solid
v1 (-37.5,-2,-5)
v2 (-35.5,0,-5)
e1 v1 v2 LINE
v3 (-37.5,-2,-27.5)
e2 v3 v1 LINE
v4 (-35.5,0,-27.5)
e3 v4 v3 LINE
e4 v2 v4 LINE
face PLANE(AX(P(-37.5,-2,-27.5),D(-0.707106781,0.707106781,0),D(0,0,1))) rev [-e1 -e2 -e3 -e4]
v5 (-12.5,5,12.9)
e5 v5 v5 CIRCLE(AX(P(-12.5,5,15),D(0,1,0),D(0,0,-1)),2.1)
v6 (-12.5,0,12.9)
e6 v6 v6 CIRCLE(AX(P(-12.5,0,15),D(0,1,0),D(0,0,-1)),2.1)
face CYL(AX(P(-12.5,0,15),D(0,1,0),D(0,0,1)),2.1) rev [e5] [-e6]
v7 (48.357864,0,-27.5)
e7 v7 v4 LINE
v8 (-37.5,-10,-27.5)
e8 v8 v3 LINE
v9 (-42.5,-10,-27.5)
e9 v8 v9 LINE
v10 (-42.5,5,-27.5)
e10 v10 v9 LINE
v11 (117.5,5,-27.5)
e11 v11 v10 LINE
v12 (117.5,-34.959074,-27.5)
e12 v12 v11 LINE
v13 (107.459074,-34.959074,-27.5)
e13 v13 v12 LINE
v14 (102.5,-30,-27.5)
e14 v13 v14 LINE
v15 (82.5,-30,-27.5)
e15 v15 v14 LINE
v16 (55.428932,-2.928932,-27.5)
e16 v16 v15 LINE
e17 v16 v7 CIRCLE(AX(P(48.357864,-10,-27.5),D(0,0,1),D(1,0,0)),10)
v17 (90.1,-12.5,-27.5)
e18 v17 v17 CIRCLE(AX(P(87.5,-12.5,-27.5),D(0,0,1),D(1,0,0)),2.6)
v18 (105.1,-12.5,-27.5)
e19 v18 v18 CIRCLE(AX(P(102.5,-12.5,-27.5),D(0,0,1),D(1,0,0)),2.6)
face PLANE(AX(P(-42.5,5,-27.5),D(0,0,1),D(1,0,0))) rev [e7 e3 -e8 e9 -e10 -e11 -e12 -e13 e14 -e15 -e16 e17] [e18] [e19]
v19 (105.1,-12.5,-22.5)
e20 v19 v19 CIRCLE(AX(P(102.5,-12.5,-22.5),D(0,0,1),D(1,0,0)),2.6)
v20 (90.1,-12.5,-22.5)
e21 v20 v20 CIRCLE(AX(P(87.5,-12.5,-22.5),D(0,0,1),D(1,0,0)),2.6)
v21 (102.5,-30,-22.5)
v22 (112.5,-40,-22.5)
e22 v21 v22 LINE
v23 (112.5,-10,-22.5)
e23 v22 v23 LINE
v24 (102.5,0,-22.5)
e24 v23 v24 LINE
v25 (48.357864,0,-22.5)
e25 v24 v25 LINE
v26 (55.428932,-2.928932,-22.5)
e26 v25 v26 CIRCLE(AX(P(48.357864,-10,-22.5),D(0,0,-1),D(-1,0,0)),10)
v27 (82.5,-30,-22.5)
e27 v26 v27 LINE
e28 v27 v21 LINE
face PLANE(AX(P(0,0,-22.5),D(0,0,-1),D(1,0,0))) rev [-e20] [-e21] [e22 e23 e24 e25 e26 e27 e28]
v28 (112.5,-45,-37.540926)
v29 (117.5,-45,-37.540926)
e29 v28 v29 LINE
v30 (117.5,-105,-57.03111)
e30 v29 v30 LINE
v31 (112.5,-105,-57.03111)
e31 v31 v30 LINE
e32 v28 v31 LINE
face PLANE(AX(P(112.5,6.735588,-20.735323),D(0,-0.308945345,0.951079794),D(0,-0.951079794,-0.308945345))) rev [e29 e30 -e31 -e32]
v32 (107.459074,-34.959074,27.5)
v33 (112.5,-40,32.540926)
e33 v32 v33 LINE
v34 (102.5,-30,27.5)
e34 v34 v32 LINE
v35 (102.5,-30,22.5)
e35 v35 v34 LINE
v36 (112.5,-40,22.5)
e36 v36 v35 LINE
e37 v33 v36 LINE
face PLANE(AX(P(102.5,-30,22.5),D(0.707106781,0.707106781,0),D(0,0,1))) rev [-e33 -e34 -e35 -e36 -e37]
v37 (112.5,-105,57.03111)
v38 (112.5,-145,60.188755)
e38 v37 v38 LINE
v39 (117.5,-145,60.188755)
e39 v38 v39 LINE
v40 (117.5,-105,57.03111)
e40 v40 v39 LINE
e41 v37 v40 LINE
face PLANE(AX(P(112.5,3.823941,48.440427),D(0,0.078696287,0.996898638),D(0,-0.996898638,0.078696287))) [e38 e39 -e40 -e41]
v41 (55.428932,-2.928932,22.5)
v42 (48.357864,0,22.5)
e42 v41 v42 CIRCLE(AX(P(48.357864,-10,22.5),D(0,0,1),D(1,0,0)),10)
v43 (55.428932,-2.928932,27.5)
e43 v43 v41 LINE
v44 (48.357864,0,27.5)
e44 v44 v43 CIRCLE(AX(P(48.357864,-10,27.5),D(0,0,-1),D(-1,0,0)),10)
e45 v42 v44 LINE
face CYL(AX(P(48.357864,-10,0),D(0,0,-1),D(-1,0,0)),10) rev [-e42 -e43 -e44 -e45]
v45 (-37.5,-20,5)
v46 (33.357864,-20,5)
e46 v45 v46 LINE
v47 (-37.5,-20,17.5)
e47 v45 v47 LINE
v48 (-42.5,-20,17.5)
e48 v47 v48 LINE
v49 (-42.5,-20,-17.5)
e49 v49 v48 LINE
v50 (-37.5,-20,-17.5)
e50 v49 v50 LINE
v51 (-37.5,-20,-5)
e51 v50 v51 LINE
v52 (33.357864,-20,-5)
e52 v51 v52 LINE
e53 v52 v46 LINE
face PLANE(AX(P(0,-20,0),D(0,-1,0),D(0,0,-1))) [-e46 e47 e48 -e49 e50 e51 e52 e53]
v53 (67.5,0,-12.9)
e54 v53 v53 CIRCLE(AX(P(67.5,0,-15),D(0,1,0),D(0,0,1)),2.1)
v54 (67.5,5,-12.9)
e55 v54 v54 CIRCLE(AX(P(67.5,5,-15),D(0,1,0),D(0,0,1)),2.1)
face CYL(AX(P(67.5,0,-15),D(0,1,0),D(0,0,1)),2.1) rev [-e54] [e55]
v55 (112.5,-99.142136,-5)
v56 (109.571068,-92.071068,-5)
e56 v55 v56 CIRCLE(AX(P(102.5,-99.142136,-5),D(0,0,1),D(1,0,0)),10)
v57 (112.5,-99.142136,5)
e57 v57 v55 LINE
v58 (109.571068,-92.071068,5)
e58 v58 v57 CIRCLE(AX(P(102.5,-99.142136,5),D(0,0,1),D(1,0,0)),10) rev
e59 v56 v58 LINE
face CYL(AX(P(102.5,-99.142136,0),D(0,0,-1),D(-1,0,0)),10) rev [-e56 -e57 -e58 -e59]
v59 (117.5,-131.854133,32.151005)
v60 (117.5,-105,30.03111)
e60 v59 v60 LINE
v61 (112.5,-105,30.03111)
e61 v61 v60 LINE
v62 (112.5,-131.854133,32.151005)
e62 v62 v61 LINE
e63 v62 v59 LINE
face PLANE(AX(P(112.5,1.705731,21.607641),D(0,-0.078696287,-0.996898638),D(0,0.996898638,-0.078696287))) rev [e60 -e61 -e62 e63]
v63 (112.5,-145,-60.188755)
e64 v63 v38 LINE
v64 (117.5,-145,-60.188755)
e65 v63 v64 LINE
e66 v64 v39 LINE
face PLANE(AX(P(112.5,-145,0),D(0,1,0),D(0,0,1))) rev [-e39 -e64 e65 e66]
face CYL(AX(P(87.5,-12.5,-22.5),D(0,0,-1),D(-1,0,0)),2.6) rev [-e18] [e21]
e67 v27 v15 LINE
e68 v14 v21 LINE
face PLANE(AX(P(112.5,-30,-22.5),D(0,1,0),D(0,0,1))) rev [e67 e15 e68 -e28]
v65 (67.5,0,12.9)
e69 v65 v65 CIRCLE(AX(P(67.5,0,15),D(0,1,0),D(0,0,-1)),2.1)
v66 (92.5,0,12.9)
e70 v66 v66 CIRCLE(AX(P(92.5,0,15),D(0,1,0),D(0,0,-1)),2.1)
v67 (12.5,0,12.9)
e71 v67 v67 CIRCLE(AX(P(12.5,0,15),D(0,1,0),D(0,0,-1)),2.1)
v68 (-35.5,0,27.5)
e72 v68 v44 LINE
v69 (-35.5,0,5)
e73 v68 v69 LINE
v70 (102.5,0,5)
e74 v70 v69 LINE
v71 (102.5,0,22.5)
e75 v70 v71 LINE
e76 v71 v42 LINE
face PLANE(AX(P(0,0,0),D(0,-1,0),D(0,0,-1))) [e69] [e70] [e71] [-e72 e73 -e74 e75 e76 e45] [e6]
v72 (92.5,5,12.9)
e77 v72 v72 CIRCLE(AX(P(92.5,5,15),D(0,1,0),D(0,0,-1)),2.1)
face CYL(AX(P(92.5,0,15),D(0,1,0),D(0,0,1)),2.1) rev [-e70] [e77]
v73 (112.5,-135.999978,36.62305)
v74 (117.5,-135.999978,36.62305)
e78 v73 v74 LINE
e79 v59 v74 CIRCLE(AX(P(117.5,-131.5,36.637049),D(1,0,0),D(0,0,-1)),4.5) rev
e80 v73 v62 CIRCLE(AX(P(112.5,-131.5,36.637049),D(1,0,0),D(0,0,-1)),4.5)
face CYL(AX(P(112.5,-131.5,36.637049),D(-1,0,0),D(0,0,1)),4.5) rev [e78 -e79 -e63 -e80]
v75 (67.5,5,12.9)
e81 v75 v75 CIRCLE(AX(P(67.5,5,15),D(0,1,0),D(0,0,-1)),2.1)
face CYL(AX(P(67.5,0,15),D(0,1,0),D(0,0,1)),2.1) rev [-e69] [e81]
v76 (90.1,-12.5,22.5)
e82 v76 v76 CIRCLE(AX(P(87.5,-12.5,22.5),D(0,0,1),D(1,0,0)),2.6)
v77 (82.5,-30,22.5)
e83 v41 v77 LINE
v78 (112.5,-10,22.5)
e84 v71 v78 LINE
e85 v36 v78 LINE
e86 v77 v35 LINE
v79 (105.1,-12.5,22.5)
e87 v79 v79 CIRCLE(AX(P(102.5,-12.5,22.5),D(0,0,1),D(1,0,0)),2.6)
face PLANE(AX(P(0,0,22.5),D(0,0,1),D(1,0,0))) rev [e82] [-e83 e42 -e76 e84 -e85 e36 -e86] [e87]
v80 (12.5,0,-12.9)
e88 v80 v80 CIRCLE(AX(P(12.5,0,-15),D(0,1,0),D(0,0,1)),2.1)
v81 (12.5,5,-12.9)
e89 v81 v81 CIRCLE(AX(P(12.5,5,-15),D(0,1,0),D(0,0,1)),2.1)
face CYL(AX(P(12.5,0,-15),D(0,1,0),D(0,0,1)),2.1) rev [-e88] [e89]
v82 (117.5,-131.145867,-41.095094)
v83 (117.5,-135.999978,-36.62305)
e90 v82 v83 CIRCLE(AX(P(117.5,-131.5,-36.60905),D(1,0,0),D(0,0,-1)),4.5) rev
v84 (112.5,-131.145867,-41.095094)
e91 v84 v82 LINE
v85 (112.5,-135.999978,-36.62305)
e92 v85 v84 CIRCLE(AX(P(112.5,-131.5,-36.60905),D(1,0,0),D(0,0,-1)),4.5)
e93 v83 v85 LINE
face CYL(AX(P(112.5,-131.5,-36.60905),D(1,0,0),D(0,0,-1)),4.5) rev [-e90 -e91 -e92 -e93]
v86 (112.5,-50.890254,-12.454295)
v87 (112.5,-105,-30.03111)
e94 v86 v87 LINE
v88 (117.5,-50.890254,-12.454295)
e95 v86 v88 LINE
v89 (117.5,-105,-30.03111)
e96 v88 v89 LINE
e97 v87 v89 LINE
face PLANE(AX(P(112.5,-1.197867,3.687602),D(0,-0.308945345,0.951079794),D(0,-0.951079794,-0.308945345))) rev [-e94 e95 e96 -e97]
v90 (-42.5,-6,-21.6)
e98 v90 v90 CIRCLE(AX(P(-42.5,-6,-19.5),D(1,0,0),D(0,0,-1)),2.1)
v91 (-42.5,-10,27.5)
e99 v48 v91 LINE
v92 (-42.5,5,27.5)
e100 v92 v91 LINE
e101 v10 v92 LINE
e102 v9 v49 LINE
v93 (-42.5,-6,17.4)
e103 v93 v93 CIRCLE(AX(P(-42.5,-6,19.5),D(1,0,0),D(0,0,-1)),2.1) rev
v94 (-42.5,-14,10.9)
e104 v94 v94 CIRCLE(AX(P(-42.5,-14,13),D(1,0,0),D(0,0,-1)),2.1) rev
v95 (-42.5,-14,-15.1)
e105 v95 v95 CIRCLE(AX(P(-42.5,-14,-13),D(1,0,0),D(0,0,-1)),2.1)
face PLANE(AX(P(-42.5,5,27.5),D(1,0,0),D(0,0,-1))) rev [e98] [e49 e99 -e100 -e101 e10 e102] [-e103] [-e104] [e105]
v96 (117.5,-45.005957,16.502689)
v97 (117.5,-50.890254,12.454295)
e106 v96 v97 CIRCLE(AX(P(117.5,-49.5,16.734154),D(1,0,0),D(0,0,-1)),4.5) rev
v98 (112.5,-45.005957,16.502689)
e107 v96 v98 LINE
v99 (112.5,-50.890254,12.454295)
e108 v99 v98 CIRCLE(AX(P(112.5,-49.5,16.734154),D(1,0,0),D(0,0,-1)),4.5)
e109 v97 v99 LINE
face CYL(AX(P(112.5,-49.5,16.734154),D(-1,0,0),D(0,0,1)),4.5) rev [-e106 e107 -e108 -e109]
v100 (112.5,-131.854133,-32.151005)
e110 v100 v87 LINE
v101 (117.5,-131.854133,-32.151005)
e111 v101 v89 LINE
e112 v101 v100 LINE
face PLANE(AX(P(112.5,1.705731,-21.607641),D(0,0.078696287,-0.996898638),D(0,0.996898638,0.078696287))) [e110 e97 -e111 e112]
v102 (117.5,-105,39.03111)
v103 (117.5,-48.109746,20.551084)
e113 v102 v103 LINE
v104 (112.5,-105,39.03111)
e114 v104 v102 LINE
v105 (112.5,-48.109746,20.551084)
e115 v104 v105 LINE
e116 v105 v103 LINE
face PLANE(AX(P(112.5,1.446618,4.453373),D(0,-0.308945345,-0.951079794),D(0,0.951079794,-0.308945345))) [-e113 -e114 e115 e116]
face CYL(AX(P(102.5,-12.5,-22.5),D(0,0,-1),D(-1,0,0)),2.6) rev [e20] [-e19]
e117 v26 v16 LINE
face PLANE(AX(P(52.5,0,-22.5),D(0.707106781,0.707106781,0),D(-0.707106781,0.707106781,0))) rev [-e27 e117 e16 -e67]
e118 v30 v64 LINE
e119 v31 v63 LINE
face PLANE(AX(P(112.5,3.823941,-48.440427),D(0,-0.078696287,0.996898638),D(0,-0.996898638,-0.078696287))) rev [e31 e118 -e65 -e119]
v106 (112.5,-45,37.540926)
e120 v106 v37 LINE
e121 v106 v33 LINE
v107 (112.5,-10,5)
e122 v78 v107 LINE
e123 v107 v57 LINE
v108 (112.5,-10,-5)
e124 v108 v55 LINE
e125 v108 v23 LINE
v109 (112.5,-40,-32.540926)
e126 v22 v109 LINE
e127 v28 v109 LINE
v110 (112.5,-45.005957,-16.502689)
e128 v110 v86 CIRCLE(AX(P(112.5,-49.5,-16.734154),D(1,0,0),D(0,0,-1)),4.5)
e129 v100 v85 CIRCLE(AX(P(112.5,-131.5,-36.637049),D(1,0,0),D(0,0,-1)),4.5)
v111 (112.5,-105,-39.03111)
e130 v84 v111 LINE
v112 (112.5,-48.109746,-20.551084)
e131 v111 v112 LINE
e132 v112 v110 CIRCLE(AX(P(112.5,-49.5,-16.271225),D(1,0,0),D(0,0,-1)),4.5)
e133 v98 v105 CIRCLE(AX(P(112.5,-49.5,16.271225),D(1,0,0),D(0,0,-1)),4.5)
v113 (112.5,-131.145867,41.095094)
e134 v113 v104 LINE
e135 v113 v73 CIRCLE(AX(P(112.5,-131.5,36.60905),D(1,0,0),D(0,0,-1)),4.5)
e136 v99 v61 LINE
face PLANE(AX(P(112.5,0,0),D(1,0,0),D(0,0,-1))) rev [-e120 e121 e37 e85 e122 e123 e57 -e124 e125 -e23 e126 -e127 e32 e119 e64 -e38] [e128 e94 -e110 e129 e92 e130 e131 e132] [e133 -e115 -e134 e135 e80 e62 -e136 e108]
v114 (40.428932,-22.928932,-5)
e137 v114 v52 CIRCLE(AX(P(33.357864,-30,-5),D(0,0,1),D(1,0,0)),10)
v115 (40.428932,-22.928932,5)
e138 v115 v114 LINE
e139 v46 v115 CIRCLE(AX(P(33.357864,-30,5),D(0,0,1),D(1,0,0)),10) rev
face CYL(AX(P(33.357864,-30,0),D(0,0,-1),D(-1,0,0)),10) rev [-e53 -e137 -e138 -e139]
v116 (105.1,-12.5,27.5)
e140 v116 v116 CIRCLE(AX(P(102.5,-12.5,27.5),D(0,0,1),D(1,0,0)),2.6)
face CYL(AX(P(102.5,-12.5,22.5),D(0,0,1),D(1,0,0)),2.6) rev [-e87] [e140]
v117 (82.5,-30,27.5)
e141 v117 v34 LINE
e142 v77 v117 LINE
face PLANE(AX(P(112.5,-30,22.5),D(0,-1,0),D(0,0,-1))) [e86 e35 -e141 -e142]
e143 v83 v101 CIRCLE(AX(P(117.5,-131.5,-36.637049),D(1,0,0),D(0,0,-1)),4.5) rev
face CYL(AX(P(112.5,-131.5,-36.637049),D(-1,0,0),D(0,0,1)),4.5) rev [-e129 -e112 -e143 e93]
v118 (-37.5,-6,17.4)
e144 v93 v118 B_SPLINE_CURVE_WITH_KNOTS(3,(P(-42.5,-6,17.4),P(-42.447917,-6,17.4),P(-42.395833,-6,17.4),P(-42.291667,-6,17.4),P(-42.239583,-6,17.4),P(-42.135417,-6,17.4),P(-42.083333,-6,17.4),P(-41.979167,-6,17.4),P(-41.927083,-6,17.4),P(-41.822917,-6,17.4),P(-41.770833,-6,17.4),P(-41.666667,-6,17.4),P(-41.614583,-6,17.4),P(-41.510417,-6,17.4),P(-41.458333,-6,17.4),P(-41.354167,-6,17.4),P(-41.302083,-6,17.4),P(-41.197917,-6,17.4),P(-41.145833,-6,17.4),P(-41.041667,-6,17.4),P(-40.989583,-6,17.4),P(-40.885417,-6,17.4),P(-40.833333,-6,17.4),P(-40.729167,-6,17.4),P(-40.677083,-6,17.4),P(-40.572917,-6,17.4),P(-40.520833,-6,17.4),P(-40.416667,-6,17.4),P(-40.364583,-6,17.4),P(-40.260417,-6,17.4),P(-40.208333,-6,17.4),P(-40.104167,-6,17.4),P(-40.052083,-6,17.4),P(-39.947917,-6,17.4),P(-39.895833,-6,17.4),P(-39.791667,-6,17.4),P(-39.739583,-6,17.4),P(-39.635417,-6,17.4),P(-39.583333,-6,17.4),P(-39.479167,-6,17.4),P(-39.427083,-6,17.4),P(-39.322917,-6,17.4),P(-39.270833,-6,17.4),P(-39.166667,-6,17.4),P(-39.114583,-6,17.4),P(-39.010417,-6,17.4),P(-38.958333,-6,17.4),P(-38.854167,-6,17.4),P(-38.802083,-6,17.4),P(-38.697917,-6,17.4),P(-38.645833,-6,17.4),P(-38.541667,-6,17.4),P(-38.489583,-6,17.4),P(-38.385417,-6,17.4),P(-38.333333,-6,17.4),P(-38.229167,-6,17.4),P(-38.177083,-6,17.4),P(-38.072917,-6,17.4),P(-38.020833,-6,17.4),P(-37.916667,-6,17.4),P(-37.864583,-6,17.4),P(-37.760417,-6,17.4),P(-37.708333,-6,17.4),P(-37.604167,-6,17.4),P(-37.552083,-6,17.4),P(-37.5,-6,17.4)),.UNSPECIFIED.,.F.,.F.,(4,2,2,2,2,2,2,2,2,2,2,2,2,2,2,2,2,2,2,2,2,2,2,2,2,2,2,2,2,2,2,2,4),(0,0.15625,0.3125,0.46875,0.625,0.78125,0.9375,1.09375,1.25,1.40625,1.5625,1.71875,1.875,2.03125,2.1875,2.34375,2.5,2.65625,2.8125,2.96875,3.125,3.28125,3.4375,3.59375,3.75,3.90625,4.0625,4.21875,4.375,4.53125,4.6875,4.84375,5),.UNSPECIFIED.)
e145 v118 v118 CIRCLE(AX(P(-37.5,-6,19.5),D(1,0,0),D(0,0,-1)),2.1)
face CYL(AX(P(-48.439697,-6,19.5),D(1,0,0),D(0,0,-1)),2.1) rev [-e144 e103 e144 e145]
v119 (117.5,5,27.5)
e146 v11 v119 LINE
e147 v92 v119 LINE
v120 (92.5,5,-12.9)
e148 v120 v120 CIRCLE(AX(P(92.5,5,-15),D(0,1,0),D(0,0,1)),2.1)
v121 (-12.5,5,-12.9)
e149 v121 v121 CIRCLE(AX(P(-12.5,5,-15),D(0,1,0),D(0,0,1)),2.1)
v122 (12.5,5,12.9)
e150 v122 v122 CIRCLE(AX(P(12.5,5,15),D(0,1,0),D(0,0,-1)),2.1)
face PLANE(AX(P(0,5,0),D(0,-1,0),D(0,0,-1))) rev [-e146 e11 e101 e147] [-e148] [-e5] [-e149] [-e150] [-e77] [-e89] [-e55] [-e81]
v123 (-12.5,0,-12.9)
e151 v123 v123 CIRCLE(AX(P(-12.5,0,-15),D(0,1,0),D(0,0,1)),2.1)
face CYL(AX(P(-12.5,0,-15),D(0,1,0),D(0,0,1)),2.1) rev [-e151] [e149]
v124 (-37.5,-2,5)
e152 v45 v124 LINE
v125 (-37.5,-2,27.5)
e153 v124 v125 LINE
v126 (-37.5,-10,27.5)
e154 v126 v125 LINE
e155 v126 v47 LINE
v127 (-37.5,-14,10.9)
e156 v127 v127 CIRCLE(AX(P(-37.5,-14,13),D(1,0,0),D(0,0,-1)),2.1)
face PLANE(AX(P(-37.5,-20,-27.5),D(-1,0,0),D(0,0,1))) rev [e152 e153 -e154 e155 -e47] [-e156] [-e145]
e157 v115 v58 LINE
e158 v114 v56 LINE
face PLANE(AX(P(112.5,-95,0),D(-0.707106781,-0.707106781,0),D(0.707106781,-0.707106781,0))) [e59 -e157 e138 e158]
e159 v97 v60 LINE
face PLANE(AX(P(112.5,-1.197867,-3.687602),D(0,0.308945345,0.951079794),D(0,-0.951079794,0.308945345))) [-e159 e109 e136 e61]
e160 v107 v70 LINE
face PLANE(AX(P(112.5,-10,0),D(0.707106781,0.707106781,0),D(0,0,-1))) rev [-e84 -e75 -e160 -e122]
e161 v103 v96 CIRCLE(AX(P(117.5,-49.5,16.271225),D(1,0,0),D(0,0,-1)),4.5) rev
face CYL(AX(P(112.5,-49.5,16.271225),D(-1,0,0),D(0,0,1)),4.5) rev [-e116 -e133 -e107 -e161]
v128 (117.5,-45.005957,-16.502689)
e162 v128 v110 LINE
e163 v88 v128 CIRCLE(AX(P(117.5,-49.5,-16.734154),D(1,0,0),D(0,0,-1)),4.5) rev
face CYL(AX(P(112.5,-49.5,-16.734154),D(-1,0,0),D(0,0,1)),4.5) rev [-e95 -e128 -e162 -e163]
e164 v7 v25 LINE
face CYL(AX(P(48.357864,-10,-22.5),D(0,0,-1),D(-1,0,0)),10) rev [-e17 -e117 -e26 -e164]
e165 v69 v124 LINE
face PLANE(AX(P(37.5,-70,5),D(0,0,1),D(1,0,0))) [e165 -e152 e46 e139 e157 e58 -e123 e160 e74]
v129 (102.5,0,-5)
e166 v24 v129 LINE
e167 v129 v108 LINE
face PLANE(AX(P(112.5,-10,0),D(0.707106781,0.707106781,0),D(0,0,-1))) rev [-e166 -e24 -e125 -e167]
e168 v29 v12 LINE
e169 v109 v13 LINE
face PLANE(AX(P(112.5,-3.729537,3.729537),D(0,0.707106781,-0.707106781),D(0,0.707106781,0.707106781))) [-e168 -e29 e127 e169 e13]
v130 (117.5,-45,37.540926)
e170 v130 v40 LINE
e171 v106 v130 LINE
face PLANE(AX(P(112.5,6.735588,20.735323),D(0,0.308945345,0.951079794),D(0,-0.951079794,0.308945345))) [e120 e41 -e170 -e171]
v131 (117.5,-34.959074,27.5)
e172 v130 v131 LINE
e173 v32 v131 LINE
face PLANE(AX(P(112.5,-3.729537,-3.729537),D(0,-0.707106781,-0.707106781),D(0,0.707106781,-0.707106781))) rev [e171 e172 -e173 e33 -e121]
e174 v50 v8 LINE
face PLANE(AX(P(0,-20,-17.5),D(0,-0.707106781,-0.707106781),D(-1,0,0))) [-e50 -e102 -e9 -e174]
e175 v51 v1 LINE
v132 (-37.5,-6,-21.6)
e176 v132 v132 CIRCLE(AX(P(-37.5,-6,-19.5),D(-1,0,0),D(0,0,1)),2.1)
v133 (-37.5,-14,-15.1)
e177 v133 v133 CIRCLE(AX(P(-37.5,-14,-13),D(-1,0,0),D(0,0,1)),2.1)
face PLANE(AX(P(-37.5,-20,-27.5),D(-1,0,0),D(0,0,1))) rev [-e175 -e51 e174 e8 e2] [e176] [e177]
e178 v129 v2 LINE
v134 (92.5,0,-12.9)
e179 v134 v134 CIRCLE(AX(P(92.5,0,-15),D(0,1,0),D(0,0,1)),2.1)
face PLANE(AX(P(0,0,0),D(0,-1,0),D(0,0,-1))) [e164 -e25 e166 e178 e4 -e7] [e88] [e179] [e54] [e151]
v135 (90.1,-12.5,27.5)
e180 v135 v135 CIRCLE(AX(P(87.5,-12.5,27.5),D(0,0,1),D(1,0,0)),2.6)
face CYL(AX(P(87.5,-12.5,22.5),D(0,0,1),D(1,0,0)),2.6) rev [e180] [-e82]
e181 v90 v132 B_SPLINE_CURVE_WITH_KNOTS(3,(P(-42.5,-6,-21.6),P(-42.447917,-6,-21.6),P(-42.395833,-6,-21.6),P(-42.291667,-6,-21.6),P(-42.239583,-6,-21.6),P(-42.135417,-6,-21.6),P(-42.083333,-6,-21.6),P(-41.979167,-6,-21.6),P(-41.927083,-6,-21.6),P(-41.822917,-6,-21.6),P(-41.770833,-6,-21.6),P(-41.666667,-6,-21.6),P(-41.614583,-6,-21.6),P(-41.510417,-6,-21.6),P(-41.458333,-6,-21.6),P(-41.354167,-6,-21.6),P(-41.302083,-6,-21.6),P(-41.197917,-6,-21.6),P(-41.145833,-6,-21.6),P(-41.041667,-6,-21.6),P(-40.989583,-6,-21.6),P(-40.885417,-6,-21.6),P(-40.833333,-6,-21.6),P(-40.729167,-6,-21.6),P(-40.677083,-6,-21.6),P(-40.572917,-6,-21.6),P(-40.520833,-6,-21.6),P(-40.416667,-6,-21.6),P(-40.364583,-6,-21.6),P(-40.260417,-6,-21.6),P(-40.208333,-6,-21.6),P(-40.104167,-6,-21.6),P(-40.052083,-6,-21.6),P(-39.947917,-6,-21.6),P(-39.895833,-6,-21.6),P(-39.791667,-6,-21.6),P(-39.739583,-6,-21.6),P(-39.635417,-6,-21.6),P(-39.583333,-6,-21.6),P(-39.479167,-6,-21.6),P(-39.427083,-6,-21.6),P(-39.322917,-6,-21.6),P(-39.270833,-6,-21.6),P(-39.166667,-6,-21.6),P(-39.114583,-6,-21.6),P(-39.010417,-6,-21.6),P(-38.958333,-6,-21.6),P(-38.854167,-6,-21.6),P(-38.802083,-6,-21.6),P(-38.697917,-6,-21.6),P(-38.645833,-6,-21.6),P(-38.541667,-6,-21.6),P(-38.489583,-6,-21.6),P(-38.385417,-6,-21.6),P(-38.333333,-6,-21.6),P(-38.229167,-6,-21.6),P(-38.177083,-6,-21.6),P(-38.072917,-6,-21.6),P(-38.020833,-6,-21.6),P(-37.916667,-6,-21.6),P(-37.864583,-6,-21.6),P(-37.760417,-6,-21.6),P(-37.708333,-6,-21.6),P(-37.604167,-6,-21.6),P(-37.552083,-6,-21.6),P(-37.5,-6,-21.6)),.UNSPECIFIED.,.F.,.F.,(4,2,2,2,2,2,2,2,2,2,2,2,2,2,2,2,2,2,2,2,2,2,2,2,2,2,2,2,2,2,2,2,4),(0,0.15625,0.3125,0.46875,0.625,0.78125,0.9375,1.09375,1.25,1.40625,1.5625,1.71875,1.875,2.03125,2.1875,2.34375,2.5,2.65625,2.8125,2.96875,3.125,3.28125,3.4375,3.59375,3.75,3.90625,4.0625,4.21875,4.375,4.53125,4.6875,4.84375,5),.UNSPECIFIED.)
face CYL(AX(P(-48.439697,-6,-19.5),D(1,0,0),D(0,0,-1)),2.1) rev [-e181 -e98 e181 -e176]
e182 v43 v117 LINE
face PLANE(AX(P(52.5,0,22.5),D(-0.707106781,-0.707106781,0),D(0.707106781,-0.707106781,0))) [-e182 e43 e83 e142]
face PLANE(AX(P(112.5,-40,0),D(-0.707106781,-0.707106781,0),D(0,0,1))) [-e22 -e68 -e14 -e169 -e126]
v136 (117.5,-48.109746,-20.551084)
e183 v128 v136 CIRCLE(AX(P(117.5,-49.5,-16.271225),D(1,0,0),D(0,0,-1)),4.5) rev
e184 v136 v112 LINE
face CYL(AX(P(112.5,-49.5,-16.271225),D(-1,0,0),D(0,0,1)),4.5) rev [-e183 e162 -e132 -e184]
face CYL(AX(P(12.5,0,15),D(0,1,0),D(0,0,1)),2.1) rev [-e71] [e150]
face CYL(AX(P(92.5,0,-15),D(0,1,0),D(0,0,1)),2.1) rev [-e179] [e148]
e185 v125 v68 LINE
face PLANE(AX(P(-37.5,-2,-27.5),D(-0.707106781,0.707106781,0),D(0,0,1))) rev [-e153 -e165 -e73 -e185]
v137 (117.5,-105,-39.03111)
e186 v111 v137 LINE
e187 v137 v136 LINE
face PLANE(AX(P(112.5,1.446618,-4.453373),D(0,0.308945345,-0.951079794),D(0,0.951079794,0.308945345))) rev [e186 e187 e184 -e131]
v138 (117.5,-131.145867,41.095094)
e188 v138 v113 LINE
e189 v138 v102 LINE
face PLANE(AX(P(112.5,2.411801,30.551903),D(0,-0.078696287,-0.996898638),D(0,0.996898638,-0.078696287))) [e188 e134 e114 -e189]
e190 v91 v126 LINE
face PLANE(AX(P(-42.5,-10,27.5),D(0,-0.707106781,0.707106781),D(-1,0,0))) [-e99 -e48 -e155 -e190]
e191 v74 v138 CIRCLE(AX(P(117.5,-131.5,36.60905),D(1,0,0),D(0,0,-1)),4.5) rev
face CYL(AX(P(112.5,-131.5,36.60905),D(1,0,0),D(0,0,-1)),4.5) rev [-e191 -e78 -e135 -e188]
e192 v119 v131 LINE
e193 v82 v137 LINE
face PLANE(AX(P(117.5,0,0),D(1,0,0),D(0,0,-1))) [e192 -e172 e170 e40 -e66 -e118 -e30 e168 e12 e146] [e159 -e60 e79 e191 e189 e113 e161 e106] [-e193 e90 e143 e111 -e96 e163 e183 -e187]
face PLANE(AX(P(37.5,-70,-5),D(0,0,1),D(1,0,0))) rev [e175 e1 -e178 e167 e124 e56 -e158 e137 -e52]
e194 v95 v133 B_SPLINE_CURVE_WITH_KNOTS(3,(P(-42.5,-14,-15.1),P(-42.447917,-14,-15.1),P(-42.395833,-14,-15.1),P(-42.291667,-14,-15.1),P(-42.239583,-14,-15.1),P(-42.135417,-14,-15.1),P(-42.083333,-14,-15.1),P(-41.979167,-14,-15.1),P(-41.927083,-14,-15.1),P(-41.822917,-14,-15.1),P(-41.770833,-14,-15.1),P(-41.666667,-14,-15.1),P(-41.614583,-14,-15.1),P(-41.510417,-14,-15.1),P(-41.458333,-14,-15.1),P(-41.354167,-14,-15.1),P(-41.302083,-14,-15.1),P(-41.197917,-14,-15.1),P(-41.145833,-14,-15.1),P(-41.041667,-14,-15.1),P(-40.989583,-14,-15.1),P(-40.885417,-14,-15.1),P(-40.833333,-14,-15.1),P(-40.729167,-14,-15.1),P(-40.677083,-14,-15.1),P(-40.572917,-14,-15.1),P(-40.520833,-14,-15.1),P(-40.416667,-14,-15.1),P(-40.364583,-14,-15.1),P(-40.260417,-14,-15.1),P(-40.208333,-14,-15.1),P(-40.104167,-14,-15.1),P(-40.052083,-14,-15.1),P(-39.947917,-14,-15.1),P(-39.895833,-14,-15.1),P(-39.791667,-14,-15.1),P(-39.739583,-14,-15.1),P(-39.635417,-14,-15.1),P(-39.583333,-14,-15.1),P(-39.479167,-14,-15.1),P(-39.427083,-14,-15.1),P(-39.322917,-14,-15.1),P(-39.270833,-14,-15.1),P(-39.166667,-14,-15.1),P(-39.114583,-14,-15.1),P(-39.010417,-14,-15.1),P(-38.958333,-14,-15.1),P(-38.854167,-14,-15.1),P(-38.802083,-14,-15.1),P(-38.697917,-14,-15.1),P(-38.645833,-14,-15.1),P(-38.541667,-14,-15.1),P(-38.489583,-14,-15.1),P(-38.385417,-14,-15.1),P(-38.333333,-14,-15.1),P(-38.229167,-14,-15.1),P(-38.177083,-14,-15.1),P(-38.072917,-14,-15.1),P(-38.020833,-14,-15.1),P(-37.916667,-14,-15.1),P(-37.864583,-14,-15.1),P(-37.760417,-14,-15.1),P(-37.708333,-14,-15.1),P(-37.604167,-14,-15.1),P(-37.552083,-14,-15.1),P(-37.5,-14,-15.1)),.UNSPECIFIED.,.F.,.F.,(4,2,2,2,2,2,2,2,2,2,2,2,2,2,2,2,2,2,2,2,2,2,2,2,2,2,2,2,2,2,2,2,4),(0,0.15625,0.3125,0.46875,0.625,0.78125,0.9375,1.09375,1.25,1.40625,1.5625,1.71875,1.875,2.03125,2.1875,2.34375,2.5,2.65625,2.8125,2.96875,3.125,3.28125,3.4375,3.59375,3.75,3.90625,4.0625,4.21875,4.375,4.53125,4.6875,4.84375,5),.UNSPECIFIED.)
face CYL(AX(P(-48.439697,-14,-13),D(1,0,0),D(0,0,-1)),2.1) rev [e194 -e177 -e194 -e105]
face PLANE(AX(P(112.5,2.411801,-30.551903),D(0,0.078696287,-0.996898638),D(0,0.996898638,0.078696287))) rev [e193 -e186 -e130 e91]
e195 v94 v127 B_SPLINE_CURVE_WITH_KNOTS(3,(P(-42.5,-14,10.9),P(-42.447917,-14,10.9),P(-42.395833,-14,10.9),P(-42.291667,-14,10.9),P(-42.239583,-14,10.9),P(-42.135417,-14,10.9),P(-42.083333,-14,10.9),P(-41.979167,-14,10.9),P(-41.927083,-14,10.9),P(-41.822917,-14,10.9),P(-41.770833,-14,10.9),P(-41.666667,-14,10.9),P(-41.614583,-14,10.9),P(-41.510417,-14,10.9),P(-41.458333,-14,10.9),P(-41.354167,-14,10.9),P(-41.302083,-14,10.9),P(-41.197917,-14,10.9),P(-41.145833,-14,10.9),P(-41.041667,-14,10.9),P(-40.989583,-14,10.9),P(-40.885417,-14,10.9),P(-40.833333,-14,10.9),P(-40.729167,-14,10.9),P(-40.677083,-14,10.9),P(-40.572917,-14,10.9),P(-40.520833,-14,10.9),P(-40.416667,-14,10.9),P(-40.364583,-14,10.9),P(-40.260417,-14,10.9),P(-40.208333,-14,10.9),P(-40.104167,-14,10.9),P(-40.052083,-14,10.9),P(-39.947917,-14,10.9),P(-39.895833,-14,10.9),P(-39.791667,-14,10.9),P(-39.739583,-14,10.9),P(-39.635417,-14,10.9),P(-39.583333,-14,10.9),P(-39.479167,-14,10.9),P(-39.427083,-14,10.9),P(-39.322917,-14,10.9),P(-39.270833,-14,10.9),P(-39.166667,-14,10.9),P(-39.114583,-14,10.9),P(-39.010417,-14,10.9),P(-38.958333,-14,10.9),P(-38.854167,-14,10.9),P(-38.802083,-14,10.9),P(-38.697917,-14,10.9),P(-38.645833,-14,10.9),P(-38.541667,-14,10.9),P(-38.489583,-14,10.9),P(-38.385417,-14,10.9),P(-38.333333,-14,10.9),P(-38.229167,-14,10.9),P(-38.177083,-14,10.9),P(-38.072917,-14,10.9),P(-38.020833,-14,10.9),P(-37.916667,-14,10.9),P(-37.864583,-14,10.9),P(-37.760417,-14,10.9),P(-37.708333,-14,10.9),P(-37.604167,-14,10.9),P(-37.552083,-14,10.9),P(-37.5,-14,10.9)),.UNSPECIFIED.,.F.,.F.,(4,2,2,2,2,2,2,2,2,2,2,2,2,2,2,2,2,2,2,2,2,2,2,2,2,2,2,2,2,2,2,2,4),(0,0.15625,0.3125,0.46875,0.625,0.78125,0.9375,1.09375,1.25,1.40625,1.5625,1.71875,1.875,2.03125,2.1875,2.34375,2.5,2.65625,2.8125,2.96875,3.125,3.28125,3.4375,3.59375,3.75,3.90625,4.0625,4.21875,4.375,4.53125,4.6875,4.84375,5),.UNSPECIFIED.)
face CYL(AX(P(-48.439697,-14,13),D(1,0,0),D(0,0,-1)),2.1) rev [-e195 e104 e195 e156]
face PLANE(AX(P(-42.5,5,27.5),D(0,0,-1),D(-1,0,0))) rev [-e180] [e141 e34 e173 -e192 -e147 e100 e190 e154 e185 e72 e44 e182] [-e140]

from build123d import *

# Parameters (mm, degrees)
SKETCH_1_W          = 85
SKETCH_1_H          = 55
EXTRUDE_1_DEPTH     = 5
SKETCH_2_W          = 5
SKETCH_2_H          = 55
EXTRUDE_2_DEPTH     = 20
SKETCH_3_W          = 55
SKETCH_3_H          = 5
EXTRUDE_3_DEPTH     = 75
SKETCH_7_R          = 2.1
CUT_EXTRUDE_1_DEPTH = 5
EXTRUDE_4_DEPTH     = 5
FILLET_1_R          = 4.5
RIB_START           = -5
RIB_1_DEPTH         = 10
EXTRUDE_5_DEPTH     = 5
SKETCH_12_R         = 2.6
CUT_EXTRUDE_2_DEPTH = 5
CHAMFER_1_SIZE      = 10
CHAMFER_2_SIZE      = 10
SKETCH_13_R         = 2.1
CUT_EXTRUDE_3_DEPTH = 5
CHAMFER_3_SIZE      = 10
FILLET_2_R          = 10
FILLET_3_R          = 10
CHAMFER_4_SIZE      = 2


# Read off the part's stored shape, not the designer's step: 筋1
with BuildPart() as part:
    # 草图1 → 凸台-拉伸1 (new body)
    with BuildSketch(Plane(origin=(0, 0, 0), x_dir=(1, 0, 0), z_dir=(0, 1, 0))):
        Rectangle(SKETCH_1_W, SKETCH_1_H)
    extrude(amount=EXTRUDE_1_DEPTH)

    # 草图2 → 凸台-拉伸2 (add)
    with BuildSketch(Plane.XZ):
        with Locations((-40, 0)):
            Rectangle(SKETCH_2_W, SKETCH_2_H)
    extrude(amount=EXTRUDE_2_DEPTH)

    # 草图3 → 凸台-拉伸3 (add)
    with BuildSketch(Plane(origin=(42.5, 0, 0), x_dir=(0, 0, -1), z_dir=(1, 0, 0))):
        with Locations((0, 2.5)):
            Rectangle(SKETCH_3_W, SKETCH_3_H)
    extrude(amount=EXTRUDE_3_DEPTH)

    # 草图7 → 切除-拉伸1 (cut)
    with BuildSketch(Plane(origin=(0, 5, 0), x_dir=(1, 0, 0), z_dir=(0, 1, 0))):
        with Locations(Location((-12.5, 15, 0), (0, 0, 270))):
            Circle(SKETCH_7_R)
        with Locations(Location((12.5, 15, 0), (0, 0, 270))):
            Circle(SKETCH_7_R)
        with Locations(Location((67.5, 15, 0), (0, 0, 270))):
            Circle(SKETCH_7_R)
        with Locations(Location((92.5, 15, 0), (0, 0, 270))):
            Circle(SKETCH_7_R)
        with Locations(Location((92.5, -15, 0), (0, 0, 90))):
            Circle(SKETCH_7_R)
        with Locations(Location((67.5, -15, 0), (0, 0, 90))):
            Circle(SKETCH_7_R)
        with Locations(Location((12.5, -15, 0), (0, 0, 90))):
            Circle(SKETCH_7_R)
        with Locations(Location((-12.5, -15, 0), (0, 0, 90))):
            Circle(SKETCH_7_R)
    extrude(amount=-CUT_EXTRUDE_1_DEPTH, mode=Mode.SUBTRACT)

    # 草图8 → 凸台-拉伸4 (add)
    with BuildSketch(Plane(origin=(117.5, 0, 0), x_dir=(0, 0, -1), z_dir=(1, 0, 0))):
        Polygon((-33.188754566, -145), (-27.5, -145), (27.5, -145), (60.188754566, -145), (57.031110104, -105), (37.540925534, -45), (27.5, -34.959074466), (27.5, -20), (27.5, 0), (-27.5, 0), (-27.5, -20), (-27.5, -34.959074466), (-37.540925534, -45), (-57.031110104, -105), (-60.188754566, -145), (-42.188754566, -145), align=None)
        Polygon((-32.478284562, -136), (-41.478284562, -136), (-39.031110104, -105), (-19.540925534, -45), (-10.540925534, -45), (-30.031110104, -105), align=None, mode=Mode.SUBTRACT)
        Polygon((41.478284562, -136), (32.478284562, -136), (30.031110104, -105), (10.540925534, -45), (19.540925534, -45), (39.031110104, -105), align=None, mode=Mode.SUBTRACT)
    extrude(amount=-EXTRUDE_4_DEPTH)

    # 圆角1
    # the kernel refuses this fillet: 4.5 mm, written as the material it adds along each edge
    with BuildSketch(Plane(origin=(117.5, -45, -19.540925534), x_dir=(0, -0.9510797935163557, -0.30894534527143475), z_dir=(-1, 0, 0)), Plane(origin=(117.5, -45, 19.540925534), x_dir=(0, 0, -1), z_dir=(-1, 0, 0))) as fillet_1_piece_1:
        with BuildLine():
            CenterArc((FILLET_1_R * 0.726600080708, FILLET_1_R), FILLET_1_R, 197.995683599, 72.004316401)
            Line((-FILLET_1_R * 0.224479712809, FILLET_1_R * 0.691054654729), (0, 0))
            Line((0, 0), (FILLET_1_R * 0.726600080708, 0))
        make_face()
    extrude(amount=5)
    with BuildSketch(Plane(origin=(117.5, -45, -10.540925534), x_dir=(0, 0, -1), z_dir=(-1, 0, 0)), Plane(origin=(117.5, -45, 10.540925534), x_dir=(0, -0.9510797935163557, 0.30894534527143513), z_dir=(-1, 0, 0))) as fillet_1_piece_2:
        with BuildLine():
            CenterArc((FILLET_1_R * 1.3762728997, FILLET_1_R), FILLET_1_R, 162.004316401, 107.995683599)
            Line((FILLET_1_R * 0.425193106186, FILLET_1_R * 1.30894534527), (0, 0))
            Line((0, 0), (FILLET_1_R * 1.3762728997, 0))
        make_face()
    extrude(amount=5)
    with BuildSketch(Plane(origin=(117.5, -136, -32.478284562), x_dir=(0, 0.9968986380141637, 0.07869628660556646), z_dir=(-1, 0, 0))) as fillet_1_piece_3:
        with BuildLine():
            CenterArc((FILLET_1_R * 0.924169898787, FILLET_1_R), FILLET_1_R, 184.513632187, 85.486367813)
            Line((-FILLET_1_R * 0.0727287392272, FILLET_1_R * 0.921303713394), (0, 0))
            Line((0, 0), (FILLET_1_R * 0.924169898787, 0))
        make_face()
    extrude(amount=5)
    with BuildSketch(Plane(origin=(117.5, -136, -41.478284562), x_dir=(0, 0.9968986380141637, 0.07869628660556578), z_dir=(-1, 0, 0))) as fillet_1_piece_4:
        with BuildLine():
            CenterArc((FILLET_1_R * 1.08205212192, -FILLET_1_R), FILLET_1_R, 90, 94.513632187)
            Line((FILLET_1_R * 0.085153483909, -FILLET_1_R * 1.07869628661), (0, 0))
            Line((0, 0), (FILLET_1_R * 1.08205212192, 0))
        make_face()
    extrude(amount=5)
    with BuildSketch(Plane(origin=(117.5, -136, 32.478284562), x_dir=(0, 0.9968986380141636, -0.078696286605567), z_dir=(-1, 0, 0))) as fillet_1_piece_5:
        with BuildLine():
            CenterArc((FILLET_1_R * 0.924169898787, -FILLET_1_R), FILLET_1_R, 90, 85.486367813)
            Line((-FILLET_1_R * 0.0727287392272, -FILLET_1_R * 0.921303713394), (0, 0))
            Line((0, 0), (FILLET_1_R * 0.924169898787, 0))
        make_face()
    extrude(amount=5)
    with BuildSketch(Plane(origin=(117.5, -136, 41.478284562), x_dir=(0, 0.9968986380141637, -0.07869628660556578), z_dir=(-1, 0, 0))) as fillet_1_piece_6:
        with BuildLine():
            CenterArc((FILLET_1_R * 1.08205212192, FILLET_1_R), FILLET_1_R, 175.486367813, 94.513632187)
            Line((FILLET_1_R * 0.085153483909, FILLET_1_R * 1.07869628661), (0, 0))
            Line((0, 0), (FILLET_1_R * 1.08205212192, 0))
        make_face()
    extrude(amount=5)

    # 筋1 outline → 筋1 (add)
    with BuildSketch(Plane.XY.offset(RIB_START)):
        Polygon((-37.5, 0), (-37.5, -20), (37.5, -20), (112.5, -95), (112.5, 0), align=None)
    extrude(amount=RIB_1_DEPTH)

    # 草图10 → 凸台-拉伸5 (add)
    with BuildSketch(Plane.XY.offset(27.5)):
        Polygon((112.5, 0), (112.5, -30), (82.5, -30), (52.5, 0), align=None)
    extrude_5 = extrude(amount=-EXTRUDE_5_DEPTH)

    # 草图12 → 切除-拉伸2 (cut)
    with BuildSketch(Plane.XY.offset(27.5)):
        with Locations((87.5, -12.5)):
            Circle(SKETCH_12_R)
        with Locations((102.5, -12.5)):
            Circle(SKETCH_12_R)
    cut_extrude_2 = extrude(amount=-CUT_EXTRUDE_2_DEPTH, mode=Mode.SUBTRACT)

    # 镜向2: 凸台-拉伸5, 切除-拉伸2 across plane
    add(extrude_5.mirror(Plane.XY))
    add(cut_extrude_2.mirror(Plane.XY), mode=Mode.SUBTRACT)

    # 倒角1
    chamfer_1_edges = [part.edges().sort_by_distance(p)[0] for p in [
        (112.5, -30, -25),
        (112.5, -30, 25),
    ]]
    chamfer(chamfer_1_edges, length=CHAMFER_1_SIZE)

    # 倒角2
    chamfer_2_edges = [part.edges().sort_by_distance(p)[0] for p in [
        (112.5, 0, -13.75),
        (112.5, 0, 13.75),
    ]]
    chamfer(chamfer_2_edges, length=CHAMFER_2_SIZE)

    # 草图13 → 切除-拉伸3 (cut)
    with BuildSketch(Plane(origin=(-37.5, 0, 0), x_dir=(0, 0, -1), z_dir=(1, 0, 0))):
        with Locations((-19.5, -6)):
            Circle(SKETCH_13_R)
        with Locations((-13, -14)):
            Circle(SKETCH_13_R)
    cut_extrude_3 = extrude(amount=-CUT_EXTRUDE_3_DEPTH, mode=Mode.SUBTRACT)

    # 镜向3: 切除-拉伸3 across plane
    add(cut_extrude_3.mirror(Plane.XY), mode=Mode.SUBTRACT)

    # 倒角3
    chamfer_3_edges = [part.edges().sort_by_distance(p)[0] for p in [
        (-40, -20, 27.5),
        (-40, -20, -27.5),
    ]]
    chamfer(chamfer_3_edges, length=CHAMFER_3_SIZE)

    # 圆角2
    fillet_2_edges = [part.edges().sort_by_distance(p)[0] for p in [
        (112.5, -95, 0),
        (37.5, -20, 0),
    ]]
    fillet(fillet_2_edges, radius=FILLET_2_R)

    # 圆角3
    fillet_3_edges = [part.edges().sort_by_distance(p)[0] for p in [
        (52.5, 0, 25),
        (52.5, 0, -25),
    ]]
    fillet(fillet_3_edges, radius=FILLET_3_R)

    # 倒角4
    chamfer_4_edges = [part.edges().sort_by_distance(p)[0] for p in [
        (-37.5, 0, -16.25),
        (-37.5, 0, 16.25),
    ]]
    chamfer(chamfer_4_edges, length=CHAMFER_4_SIZE)


solid = part.part
